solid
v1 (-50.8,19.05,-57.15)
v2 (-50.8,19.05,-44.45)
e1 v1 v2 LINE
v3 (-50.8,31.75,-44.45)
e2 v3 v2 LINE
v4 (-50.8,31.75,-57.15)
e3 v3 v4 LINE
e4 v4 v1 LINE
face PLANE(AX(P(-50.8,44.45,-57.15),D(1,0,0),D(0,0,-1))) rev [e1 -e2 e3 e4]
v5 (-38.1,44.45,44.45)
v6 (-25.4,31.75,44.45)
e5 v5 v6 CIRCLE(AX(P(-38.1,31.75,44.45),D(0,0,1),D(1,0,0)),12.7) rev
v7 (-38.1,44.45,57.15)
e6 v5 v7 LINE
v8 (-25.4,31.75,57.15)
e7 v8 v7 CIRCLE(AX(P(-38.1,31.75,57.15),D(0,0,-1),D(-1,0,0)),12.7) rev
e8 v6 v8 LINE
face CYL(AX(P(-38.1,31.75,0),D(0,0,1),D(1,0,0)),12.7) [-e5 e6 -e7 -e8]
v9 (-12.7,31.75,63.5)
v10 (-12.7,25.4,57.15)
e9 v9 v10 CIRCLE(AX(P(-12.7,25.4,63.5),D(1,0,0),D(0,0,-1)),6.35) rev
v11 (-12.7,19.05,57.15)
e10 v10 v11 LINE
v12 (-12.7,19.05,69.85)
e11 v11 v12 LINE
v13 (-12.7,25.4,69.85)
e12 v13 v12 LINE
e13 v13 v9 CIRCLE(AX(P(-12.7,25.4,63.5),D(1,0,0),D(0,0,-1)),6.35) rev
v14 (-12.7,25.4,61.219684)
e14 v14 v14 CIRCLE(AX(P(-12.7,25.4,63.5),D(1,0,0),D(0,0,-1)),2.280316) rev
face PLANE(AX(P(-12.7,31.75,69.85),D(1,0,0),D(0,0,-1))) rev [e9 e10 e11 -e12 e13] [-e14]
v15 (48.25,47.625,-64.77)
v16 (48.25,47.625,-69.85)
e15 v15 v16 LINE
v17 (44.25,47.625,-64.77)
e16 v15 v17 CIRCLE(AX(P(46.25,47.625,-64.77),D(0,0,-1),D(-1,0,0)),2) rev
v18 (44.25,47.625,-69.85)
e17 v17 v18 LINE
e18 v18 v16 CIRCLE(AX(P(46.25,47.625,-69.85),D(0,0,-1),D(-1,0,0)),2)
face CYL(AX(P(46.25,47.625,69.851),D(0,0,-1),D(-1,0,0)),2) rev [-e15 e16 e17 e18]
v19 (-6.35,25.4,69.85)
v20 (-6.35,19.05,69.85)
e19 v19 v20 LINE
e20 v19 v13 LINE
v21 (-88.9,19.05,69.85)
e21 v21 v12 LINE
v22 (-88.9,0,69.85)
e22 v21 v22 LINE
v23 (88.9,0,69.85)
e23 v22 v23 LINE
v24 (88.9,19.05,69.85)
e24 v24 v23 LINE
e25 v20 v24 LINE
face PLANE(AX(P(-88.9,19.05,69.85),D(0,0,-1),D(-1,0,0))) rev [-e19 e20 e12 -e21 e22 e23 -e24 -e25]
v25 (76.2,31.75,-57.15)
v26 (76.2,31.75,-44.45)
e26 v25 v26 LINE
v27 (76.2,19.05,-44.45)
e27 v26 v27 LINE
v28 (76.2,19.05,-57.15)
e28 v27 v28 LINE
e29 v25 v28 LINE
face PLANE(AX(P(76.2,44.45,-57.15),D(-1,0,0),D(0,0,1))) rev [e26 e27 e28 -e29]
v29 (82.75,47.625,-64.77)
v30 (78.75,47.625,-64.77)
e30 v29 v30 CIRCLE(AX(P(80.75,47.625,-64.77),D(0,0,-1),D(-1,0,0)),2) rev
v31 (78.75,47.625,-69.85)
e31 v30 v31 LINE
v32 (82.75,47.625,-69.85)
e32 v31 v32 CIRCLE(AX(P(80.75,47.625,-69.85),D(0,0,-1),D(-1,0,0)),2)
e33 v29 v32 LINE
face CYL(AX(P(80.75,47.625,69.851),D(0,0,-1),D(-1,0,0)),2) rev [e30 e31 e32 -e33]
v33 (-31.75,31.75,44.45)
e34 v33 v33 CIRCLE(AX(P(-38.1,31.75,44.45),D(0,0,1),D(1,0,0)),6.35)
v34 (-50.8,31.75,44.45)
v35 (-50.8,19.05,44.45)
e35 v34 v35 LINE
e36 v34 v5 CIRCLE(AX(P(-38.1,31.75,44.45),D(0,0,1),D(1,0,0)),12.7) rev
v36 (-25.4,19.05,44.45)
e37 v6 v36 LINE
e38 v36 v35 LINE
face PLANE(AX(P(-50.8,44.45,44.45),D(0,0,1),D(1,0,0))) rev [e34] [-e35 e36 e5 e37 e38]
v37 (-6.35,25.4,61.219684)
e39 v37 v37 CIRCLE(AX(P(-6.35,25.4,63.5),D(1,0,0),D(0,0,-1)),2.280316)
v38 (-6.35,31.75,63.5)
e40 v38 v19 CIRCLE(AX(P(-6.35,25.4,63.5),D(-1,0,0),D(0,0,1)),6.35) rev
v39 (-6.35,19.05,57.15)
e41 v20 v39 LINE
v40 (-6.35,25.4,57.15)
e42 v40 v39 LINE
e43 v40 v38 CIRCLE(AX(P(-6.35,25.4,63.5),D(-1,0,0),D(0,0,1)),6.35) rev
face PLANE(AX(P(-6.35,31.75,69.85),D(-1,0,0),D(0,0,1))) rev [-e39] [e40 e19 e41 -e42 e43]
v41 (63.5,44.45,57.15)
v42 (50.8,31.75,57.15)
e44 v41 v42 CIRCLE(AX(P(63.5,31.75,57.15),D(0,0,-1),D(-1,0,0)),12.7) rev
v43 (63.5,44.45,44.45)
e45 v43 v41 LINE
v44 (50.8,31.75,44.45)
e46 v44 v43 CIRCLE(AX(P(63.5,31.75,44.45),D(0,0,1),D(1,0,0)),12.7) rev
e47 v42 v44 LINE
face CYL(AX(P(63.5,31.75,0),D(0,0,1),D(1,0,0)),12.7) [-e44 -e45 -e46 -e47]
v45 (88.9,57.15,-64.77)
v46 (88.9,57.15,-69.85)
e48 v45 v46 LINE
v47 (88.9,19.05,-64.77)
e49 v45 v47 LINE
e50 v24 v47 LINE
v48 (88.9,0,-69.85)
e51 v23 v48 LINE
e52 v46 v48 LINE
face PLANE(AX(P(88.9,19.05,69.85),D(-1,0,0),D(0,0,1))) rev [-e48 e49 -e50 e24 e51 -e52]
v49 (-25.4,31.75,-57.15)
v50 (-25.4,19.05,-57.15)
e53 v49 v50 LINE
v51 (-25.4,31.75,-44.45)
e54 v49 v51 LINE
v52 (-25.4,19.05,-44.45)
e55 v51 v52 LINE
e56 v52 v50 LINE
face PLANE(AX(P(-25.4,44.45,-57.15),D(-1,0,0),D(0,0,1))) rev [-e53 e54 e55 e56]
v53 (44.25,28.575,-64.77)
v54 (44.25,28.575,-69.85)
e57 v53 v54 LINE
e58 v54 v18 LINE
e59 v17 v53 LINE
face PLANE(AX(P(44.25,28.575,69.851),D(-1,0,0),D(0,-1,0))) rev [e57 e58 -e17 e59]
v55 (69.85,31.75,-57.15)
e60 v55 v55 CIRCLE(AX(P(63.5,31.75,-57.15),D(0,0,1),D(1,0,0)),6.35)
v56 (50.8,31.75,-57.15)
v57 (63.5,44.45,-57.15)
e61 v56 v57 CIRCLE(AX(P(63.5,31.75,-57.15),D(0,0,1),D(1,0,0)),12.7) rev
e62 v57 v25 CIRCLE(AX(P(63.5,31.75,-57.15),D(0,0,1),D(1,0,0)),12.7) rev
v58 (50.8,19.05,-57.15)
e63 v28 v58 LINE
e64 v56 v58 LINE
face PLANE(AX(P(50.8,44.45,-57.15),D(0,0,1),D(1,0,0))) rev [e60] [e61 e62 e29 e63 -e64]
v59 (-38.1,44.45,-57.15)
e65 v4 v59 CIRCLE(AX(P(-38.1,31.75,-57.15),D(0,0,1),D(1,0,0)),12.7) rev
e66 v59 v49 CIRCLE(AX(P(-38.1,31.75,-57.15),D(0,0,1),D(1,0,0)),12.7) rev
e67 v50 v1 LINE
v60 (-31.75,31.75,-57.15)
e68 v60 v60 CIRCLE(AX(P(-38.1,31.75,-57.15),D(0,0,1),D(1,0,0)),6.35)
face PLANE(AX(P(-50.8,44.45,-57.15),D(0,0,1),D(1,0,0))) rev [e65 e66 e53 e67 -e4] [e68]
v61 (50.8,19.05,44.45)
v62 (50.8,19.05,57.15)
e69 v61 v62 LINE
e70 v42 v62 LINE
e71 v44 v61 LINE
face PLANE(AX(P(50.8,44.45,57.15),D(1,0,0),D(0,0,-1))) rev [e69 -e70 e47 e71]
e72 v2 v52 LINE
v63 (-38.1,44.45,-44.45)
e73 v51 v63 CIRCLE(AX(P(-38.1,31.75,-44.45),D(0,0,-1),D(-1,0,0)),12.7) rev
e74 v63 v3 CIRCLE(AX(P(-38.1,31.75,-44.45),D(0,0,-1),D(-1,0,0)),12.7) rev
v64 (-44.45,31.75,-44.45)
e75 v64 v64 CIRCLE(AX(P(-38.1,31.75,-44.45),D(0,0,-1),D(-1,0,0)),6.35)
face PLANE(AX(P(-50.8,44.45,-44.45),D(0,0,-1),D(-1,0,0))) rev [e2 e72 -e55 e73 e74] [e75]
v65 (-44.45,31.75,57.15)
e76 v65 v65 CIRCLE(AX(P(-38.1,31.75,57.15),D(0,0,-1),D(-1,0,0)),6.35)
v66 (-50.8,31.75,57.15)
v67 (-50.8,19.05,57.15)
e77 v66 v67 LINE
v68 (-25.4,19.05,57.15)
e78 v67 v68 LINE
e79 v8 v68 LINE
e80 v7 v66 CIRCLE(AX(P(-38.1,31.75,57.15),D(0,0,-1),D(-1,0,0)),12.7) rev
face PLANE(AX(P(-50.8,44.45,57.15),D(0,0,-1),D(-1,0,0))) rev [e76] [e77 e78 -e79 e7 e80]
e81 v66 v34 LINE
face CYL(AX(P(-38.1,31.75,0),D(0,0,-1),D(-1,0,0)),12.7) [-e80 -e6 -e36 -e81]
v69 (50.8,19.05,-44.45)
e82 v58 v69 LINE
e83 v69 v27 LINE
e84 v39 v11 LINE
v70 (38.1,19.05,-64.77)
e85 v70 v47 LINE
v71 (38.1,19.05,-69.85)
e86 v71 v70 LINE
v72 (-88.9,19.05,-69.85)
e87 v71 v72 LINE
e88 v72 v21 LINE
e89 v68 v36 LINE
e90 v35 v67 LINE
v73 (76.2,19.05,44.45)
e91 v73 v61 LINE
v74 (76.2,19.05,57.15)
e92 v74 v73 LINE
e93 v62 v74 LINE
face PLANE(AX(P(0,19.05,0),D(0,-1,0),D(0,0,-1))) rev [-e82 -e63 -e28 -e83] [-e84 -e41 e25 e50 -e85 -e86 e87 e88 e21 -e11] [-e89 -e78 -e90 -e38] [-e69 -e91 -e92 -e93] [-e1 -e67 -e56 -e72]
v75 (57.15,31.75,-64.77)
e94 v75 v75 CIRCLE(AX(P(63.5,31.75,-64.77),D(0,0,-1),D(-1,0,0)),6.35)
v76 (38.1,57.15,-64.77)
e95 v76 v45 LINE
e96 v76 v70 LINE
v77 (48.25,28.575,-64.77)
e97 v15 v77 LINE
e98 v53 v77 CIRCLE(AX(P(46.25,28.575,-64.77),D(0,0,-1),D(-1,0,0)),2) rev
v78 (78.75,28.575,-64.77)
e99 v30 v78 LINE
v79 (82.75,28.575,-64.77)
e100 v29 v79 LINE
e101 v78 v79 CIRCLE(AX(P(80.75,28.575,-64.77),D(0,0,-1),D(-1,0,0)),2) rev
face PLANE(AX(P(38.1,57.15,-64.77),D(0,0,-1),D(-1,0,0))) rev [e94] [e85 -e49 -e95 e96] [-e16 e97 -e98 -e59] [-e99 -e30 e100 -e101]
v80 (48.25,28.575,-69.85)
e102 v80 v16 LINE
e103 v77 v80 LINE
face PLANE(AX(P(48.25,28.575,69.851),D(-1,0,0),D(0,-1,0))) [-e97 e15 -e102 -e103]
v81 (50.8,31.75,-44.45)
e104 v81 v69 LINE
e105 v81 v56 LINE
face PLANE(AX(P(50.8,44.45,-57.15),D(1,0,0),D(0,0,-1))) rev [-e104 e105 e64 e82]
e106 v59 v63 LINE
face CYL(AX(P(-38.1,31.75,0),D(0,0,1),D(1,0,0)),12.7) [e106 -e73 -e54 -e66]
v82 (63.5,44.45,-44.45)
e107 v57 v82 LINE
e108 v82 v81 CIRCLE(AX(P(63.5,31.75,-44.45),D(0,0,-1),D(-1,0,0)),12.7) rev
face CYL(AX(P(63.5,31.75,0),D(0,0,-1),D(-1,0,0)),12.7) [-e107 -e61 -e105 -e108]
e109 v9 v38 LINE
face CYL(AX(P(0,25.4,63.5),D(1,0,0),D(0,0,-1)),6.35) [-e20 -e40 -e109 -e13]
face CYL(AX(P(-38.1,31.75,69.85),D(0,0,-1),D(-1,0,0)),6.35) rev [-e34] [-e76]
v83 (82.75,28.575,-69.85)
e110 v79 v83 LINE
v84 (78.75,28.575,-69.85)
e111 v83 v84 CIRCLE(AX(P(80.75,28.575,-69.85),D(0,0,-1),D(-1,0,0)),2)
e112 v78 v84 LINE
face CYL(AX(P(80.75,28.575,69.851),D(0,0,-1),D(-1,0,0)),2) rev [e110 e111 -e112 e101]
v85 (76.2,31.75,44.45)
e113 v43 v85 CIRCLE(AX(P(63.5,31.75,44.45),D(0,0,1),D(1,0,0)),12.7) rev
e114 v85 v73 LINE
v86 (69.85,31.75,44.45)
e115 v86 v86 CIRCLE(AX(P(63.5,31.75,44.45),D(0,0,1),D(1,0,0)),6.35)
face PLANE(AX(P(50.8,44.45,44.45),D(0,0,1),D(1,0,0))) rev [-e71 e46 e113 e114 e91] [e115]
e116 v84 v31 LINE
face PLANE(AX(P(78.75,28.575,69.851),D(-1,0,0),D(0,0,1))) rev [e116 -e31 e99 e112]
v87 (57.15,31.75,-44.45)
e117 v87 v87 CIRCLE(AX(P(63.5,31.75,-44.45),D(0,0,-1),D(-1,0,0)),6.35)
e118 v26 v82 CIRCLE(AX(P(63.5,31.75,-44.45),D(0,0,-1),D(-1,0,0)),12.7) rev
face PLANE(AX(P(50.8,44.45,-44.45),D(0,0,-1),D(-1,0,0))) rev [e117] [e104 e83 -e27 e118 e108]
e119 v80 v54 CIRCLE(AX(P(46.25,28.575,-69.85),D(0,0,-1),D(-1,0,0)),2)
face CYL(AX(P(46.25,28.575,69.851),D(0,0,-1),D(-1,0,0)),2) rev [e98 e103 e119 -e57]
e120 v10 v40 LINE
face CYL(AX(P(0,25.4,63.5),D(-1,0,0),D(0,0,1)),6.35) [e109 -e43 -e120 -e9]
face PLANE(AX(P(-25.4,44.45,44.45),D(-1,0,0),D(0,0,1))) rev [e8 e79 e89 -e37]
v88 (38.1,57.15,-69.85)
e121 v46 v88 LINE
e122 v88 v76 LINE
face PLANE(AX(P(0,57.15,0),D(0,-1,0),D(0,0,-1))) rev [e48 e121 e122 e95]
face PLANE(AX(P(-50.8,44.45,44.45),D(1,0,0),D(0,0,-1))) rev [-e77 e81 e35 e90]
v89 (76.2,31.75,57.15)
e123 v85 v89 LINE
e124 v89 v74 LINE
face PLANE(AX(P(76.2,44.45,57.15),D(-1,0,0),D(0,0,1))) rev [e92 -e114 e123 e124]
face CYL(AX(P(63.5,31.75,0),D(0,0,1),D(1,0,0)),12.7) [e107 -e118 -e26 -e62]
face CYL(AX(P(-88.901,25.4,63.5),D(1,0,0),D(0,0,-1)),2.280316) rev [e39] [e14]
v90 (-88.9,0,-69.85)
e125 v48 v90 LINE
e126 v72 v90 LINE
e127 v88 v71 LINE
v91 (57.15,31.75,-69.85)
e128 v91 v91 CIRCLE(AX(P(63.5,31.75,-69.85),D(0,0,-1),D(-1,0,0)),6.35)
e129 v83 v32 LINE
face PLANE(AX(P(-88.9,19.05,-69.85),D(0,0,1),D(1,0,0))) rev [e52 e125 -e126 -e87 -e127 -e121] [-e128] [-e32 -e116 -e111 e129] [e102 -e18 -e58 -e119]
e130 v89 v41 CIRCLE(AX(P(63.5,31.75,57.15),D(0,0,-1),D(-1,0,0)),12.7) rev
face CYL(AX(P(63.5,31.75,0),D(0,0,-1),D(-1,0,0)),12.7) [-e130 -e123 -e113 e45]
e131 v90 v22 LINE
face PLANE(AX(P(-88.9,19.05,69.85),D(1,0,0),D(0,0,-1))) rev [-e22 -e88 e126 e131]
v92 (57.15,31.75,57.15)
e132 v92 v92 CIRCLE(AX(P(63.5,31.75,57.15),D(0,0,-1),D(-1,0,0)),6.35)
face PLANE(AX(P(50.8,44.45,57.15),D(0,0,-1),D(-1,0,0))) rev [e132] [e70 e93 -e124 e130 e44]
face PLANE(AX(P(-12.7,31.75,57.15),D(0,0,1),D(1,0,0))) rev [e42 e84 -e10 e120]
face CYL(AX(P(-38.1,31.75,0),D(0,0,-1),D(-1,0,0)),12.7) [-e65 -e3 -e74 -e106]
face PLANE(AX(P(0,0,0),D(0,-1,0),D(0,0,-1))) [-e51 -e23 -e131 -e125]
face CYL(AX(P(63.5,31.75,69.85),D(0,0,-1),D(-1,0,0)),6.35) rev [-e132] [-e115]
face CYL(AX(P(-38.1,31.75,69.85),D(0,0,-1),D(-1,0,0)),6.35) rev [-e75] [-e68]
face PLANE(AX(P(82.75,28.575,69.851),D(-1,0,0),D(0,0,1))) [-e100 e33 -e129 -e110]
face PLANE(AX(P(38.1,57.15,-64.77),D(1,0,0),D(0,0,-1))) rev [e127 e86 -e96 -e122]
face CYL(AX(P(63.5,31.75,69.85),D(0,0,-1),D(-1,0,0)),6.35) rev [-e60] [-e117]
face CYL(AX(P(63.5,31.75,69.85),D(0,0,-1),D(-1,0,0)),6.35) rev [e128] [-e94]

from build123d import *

# Parameters (mm, degrees)
SKETCH1_W               = 177.8
SKETCH1_H               = 139.7
BOSS_EXTRUDE1_DEPTH     = 19.05
SKETCH3_W               = 25.4
SKETCH3_H               = 12.7
BOSS_EXTRUDE2_DEPTH     = 25.4
SKETCH5_W               = 50.8
SKETCH5_H               = 5.08
BOSS_EXTRUDE3_DEPTH     = 38.1
CUT_EXTRUDE1_DEPTH      = 156.672163536
CUT_EXTRUDE1_DEPTH_BACK = 156.672163536
SKETCH4_R               = 6.35
CUT_EXTRUDE2_REACH      = 177.173
SKETCH7_W               = 6.35
SKETCH7_H               = 12.7
BOSS_EXTRUDE4_DEPTH     = 12.7
FILLET1_R               = 12.7
CUT_EXTRUDE3_REACH      = 133.216
SKETCH8_R               = 2.280315524
FILLET2_R               = 6.35


with BuildPart() as part:
    # Sketch1 → Boss-Extrude1 (new body)
    with BuildSketch(Plane(origin=(0, 0, 0), x_dir=(1, 0, 0), z_dir=(0, 1, 0))):
        Rectangle(SKETCH1_W, SKETCH1_H)
    extrude(amount=BOSS_EXTRUDE1_DEPTH)

    # Sketch3 → Boss-Extrude2 (add)
    with BuildSketch(Plane(origin=(0, 19.05, 0), x_dir=(1, 0, 0), z_dir=(0, 1, 0))):
        with Locations((-38.1, 50.8)):
            Rectangle(SKETCH3_W, SKETCH3_H)
        with Locations((63.5, 50.8)):
            Rectangle(SKETCH3_W, SKETCH3_H)
        with Locations((-38.1, -50.8)):
            Rectangle(SKETCH3_W, SKETCH3_H)
        with Locations((63.5, -50.8)):
            Rectangle(SKETCH3_W, SKETCH3_H)
    extrude(amount=BOSS_EXTRUDE2_DEPTH)

    # Sketch5 → Boss-Extrude3 (add)
    with BuildSketch(Plane(origin=(0, 19.05, 0), x_dir=(1, 0, 0), z_dir=(0, 1, 0))):
        with Locations((63.5, 67.31)):
            Rectangle(SKETCH5_W, SKETCH5_H)
    extrude(amount=BOSS_EXTRUDE3_DEPTH)

    # Sketch4 → Cut-Extrude1 (cut, two sides: drawn at the far end of the back side and taken through both)
    with BuildSketch(Plane(origin=(0, 0, 44.45), x_dir=(-1, 0, 0), z_dir=(0, 0, -1)).offset(-CUT_EXTRUDE1_DEPTH_BACK)):
        with Locations((38.1, 31.75)):
            Circle(SKETCH4_R)
        with Locations((-63.5, 31.75)):
            Circle(SKETCH4_R)
    extrude(amount=CUT_EXTRUDE1_DEPTH + CUT_EXTRUDE1_DEPTH_BACK, mode=Mode.SUBTRACT)

    # Sketch6 → Cut-Extrude2 (cut, up to next)
    with BuildSketch(Plane(origin=(0, 0, -69.85), x_dir=(-1, 0, 0), z_dir=(0, 0, -1)), mode=Mode.PRIVATE) as cut_extrude2_sk1:
        with BuildLine():
            Line((-48.25, 28.575), (-48.25, 47.625))
            ThreePointArc((-48.25, 47.625), (-46.25, 49.625), (-44.25, 47.625))
            Line((-44.25, 47.625), (-44.25, 28.575))
            ThreePointArc((-44.25, 28.575), (-46.25, 26.575), (-48.25, 28.575))
        make_face()
    cut_extrude2_tool1 = extrude(cut_extrude2_sk1.sketch, amount=-CUT_EXTRUDE2_REACH, mode=Mode.PRIVATE) & part.part
    # Sketch6 → Cut-Extrude2 (cut, up to next)
    with BuildSketch(Plane(origin=(0, 0, -69.85), x_dir=(-1, 0, 0), z_dir=(0, 0, -1)), mode=Mode.PRIVATE) as cut_extrude2_sk2:
        with BuildLine():
            Line((-82.75, 28.575), (-82.75, 47.625))
            ThreePointArc((-82.75, 47.625), (-80.75, 49.625), (-78.75, 47.625))
            Line((-78.75, 47.625), (-78.75, 28.575))
            ThreePointArc((-78.75, 28.575), (-80.75, 26.575), (-82.75, 28.575))
        make_face()
    cut_extrude2_tool2 = extrude(cut_extrude2_sk2.sketch, amount=-CUT_EXTRUDE2_REACH, mode=Mode.PRIVATE) & part.part
    add(cut_extrude2_tool1.solids().sort_by_distance((46.25, 38.1, -69.85))[0], mode=Mode.SUBTRACT)
    add(cut_extrude2_tool2.solids().sort_by_distance((80.75, 38.1, -69.85))[0], mode=Mode.SUBTRACT)

    # Sketch7 → Boss-Extrude4 (add)
    with BuildSketch(Plane(origin=(0, 19.05, 0), x_dir=(1, 0, 0), z_dir=(0, 1, 0))):
        with Locations((-9.525, -63.5)):
            Rectangle(SKETCH7_W, SKETCH7_H)
    extrude(amount=BOSS_EXTRUDE4_DEPTH)

    # Fillet1
    fillet1_edges = [part.edges().sort_by_distance(p)[0] for p in [
        (76.2, 44.45, -50.8),
        (50.8, 44.45, -50.8),
        (76.2, 44.45, 50.8),
        (50.8, 44.45, 50.8),
        (-25.4, 44.45, 50.8),
        (-50.8, 44.45, 50.8),
        (-25.4, 44.45, -50.8),
        (-50.8, 44.45, -50.8),
    ]]
    fillet(fillet1_edges, radius=FILLET1_R - 0.0001)  # a hair under: the kernel refuses the full size

    # Sketch8 → Cut-Extrude3 (cut, up to next)
    with BuildSketch(Plane(origin=(-6.35, 0, 0), x_dir=(0, 0, -1), z_dir=(1, 0, 0)), mode=Mode.PRIVATE) as cut_extrude3_sk1:
        with Locations((-63.5, 25.4)):
            Circle(SKETCH8_R)
    cut_extrude3_tool1 = extrude(cut_extrude3_sk1.sketch, amount=-CUT_EXTRUDE3_REACH, mode=Mode.PRIVATE) & part.part
    add(cut_extrude3_tool1.solids().sort_by_distance((-6.35, 25.4, 63.5))[0], mode=Mode.SUBTRACT)

    # Fillet2
    fillet2_edges = [part.edges().sort_by_distance(p)[0] for p in [
        (-9.525, 31.75, 57.15),
        (-9.525, 31.75, 69.85),
    ]]
    fillet(fillet2_edges, radius=FILLET2_R - 0.0001)  # a hair under: the kernel refuses the full size


solid = part.part
